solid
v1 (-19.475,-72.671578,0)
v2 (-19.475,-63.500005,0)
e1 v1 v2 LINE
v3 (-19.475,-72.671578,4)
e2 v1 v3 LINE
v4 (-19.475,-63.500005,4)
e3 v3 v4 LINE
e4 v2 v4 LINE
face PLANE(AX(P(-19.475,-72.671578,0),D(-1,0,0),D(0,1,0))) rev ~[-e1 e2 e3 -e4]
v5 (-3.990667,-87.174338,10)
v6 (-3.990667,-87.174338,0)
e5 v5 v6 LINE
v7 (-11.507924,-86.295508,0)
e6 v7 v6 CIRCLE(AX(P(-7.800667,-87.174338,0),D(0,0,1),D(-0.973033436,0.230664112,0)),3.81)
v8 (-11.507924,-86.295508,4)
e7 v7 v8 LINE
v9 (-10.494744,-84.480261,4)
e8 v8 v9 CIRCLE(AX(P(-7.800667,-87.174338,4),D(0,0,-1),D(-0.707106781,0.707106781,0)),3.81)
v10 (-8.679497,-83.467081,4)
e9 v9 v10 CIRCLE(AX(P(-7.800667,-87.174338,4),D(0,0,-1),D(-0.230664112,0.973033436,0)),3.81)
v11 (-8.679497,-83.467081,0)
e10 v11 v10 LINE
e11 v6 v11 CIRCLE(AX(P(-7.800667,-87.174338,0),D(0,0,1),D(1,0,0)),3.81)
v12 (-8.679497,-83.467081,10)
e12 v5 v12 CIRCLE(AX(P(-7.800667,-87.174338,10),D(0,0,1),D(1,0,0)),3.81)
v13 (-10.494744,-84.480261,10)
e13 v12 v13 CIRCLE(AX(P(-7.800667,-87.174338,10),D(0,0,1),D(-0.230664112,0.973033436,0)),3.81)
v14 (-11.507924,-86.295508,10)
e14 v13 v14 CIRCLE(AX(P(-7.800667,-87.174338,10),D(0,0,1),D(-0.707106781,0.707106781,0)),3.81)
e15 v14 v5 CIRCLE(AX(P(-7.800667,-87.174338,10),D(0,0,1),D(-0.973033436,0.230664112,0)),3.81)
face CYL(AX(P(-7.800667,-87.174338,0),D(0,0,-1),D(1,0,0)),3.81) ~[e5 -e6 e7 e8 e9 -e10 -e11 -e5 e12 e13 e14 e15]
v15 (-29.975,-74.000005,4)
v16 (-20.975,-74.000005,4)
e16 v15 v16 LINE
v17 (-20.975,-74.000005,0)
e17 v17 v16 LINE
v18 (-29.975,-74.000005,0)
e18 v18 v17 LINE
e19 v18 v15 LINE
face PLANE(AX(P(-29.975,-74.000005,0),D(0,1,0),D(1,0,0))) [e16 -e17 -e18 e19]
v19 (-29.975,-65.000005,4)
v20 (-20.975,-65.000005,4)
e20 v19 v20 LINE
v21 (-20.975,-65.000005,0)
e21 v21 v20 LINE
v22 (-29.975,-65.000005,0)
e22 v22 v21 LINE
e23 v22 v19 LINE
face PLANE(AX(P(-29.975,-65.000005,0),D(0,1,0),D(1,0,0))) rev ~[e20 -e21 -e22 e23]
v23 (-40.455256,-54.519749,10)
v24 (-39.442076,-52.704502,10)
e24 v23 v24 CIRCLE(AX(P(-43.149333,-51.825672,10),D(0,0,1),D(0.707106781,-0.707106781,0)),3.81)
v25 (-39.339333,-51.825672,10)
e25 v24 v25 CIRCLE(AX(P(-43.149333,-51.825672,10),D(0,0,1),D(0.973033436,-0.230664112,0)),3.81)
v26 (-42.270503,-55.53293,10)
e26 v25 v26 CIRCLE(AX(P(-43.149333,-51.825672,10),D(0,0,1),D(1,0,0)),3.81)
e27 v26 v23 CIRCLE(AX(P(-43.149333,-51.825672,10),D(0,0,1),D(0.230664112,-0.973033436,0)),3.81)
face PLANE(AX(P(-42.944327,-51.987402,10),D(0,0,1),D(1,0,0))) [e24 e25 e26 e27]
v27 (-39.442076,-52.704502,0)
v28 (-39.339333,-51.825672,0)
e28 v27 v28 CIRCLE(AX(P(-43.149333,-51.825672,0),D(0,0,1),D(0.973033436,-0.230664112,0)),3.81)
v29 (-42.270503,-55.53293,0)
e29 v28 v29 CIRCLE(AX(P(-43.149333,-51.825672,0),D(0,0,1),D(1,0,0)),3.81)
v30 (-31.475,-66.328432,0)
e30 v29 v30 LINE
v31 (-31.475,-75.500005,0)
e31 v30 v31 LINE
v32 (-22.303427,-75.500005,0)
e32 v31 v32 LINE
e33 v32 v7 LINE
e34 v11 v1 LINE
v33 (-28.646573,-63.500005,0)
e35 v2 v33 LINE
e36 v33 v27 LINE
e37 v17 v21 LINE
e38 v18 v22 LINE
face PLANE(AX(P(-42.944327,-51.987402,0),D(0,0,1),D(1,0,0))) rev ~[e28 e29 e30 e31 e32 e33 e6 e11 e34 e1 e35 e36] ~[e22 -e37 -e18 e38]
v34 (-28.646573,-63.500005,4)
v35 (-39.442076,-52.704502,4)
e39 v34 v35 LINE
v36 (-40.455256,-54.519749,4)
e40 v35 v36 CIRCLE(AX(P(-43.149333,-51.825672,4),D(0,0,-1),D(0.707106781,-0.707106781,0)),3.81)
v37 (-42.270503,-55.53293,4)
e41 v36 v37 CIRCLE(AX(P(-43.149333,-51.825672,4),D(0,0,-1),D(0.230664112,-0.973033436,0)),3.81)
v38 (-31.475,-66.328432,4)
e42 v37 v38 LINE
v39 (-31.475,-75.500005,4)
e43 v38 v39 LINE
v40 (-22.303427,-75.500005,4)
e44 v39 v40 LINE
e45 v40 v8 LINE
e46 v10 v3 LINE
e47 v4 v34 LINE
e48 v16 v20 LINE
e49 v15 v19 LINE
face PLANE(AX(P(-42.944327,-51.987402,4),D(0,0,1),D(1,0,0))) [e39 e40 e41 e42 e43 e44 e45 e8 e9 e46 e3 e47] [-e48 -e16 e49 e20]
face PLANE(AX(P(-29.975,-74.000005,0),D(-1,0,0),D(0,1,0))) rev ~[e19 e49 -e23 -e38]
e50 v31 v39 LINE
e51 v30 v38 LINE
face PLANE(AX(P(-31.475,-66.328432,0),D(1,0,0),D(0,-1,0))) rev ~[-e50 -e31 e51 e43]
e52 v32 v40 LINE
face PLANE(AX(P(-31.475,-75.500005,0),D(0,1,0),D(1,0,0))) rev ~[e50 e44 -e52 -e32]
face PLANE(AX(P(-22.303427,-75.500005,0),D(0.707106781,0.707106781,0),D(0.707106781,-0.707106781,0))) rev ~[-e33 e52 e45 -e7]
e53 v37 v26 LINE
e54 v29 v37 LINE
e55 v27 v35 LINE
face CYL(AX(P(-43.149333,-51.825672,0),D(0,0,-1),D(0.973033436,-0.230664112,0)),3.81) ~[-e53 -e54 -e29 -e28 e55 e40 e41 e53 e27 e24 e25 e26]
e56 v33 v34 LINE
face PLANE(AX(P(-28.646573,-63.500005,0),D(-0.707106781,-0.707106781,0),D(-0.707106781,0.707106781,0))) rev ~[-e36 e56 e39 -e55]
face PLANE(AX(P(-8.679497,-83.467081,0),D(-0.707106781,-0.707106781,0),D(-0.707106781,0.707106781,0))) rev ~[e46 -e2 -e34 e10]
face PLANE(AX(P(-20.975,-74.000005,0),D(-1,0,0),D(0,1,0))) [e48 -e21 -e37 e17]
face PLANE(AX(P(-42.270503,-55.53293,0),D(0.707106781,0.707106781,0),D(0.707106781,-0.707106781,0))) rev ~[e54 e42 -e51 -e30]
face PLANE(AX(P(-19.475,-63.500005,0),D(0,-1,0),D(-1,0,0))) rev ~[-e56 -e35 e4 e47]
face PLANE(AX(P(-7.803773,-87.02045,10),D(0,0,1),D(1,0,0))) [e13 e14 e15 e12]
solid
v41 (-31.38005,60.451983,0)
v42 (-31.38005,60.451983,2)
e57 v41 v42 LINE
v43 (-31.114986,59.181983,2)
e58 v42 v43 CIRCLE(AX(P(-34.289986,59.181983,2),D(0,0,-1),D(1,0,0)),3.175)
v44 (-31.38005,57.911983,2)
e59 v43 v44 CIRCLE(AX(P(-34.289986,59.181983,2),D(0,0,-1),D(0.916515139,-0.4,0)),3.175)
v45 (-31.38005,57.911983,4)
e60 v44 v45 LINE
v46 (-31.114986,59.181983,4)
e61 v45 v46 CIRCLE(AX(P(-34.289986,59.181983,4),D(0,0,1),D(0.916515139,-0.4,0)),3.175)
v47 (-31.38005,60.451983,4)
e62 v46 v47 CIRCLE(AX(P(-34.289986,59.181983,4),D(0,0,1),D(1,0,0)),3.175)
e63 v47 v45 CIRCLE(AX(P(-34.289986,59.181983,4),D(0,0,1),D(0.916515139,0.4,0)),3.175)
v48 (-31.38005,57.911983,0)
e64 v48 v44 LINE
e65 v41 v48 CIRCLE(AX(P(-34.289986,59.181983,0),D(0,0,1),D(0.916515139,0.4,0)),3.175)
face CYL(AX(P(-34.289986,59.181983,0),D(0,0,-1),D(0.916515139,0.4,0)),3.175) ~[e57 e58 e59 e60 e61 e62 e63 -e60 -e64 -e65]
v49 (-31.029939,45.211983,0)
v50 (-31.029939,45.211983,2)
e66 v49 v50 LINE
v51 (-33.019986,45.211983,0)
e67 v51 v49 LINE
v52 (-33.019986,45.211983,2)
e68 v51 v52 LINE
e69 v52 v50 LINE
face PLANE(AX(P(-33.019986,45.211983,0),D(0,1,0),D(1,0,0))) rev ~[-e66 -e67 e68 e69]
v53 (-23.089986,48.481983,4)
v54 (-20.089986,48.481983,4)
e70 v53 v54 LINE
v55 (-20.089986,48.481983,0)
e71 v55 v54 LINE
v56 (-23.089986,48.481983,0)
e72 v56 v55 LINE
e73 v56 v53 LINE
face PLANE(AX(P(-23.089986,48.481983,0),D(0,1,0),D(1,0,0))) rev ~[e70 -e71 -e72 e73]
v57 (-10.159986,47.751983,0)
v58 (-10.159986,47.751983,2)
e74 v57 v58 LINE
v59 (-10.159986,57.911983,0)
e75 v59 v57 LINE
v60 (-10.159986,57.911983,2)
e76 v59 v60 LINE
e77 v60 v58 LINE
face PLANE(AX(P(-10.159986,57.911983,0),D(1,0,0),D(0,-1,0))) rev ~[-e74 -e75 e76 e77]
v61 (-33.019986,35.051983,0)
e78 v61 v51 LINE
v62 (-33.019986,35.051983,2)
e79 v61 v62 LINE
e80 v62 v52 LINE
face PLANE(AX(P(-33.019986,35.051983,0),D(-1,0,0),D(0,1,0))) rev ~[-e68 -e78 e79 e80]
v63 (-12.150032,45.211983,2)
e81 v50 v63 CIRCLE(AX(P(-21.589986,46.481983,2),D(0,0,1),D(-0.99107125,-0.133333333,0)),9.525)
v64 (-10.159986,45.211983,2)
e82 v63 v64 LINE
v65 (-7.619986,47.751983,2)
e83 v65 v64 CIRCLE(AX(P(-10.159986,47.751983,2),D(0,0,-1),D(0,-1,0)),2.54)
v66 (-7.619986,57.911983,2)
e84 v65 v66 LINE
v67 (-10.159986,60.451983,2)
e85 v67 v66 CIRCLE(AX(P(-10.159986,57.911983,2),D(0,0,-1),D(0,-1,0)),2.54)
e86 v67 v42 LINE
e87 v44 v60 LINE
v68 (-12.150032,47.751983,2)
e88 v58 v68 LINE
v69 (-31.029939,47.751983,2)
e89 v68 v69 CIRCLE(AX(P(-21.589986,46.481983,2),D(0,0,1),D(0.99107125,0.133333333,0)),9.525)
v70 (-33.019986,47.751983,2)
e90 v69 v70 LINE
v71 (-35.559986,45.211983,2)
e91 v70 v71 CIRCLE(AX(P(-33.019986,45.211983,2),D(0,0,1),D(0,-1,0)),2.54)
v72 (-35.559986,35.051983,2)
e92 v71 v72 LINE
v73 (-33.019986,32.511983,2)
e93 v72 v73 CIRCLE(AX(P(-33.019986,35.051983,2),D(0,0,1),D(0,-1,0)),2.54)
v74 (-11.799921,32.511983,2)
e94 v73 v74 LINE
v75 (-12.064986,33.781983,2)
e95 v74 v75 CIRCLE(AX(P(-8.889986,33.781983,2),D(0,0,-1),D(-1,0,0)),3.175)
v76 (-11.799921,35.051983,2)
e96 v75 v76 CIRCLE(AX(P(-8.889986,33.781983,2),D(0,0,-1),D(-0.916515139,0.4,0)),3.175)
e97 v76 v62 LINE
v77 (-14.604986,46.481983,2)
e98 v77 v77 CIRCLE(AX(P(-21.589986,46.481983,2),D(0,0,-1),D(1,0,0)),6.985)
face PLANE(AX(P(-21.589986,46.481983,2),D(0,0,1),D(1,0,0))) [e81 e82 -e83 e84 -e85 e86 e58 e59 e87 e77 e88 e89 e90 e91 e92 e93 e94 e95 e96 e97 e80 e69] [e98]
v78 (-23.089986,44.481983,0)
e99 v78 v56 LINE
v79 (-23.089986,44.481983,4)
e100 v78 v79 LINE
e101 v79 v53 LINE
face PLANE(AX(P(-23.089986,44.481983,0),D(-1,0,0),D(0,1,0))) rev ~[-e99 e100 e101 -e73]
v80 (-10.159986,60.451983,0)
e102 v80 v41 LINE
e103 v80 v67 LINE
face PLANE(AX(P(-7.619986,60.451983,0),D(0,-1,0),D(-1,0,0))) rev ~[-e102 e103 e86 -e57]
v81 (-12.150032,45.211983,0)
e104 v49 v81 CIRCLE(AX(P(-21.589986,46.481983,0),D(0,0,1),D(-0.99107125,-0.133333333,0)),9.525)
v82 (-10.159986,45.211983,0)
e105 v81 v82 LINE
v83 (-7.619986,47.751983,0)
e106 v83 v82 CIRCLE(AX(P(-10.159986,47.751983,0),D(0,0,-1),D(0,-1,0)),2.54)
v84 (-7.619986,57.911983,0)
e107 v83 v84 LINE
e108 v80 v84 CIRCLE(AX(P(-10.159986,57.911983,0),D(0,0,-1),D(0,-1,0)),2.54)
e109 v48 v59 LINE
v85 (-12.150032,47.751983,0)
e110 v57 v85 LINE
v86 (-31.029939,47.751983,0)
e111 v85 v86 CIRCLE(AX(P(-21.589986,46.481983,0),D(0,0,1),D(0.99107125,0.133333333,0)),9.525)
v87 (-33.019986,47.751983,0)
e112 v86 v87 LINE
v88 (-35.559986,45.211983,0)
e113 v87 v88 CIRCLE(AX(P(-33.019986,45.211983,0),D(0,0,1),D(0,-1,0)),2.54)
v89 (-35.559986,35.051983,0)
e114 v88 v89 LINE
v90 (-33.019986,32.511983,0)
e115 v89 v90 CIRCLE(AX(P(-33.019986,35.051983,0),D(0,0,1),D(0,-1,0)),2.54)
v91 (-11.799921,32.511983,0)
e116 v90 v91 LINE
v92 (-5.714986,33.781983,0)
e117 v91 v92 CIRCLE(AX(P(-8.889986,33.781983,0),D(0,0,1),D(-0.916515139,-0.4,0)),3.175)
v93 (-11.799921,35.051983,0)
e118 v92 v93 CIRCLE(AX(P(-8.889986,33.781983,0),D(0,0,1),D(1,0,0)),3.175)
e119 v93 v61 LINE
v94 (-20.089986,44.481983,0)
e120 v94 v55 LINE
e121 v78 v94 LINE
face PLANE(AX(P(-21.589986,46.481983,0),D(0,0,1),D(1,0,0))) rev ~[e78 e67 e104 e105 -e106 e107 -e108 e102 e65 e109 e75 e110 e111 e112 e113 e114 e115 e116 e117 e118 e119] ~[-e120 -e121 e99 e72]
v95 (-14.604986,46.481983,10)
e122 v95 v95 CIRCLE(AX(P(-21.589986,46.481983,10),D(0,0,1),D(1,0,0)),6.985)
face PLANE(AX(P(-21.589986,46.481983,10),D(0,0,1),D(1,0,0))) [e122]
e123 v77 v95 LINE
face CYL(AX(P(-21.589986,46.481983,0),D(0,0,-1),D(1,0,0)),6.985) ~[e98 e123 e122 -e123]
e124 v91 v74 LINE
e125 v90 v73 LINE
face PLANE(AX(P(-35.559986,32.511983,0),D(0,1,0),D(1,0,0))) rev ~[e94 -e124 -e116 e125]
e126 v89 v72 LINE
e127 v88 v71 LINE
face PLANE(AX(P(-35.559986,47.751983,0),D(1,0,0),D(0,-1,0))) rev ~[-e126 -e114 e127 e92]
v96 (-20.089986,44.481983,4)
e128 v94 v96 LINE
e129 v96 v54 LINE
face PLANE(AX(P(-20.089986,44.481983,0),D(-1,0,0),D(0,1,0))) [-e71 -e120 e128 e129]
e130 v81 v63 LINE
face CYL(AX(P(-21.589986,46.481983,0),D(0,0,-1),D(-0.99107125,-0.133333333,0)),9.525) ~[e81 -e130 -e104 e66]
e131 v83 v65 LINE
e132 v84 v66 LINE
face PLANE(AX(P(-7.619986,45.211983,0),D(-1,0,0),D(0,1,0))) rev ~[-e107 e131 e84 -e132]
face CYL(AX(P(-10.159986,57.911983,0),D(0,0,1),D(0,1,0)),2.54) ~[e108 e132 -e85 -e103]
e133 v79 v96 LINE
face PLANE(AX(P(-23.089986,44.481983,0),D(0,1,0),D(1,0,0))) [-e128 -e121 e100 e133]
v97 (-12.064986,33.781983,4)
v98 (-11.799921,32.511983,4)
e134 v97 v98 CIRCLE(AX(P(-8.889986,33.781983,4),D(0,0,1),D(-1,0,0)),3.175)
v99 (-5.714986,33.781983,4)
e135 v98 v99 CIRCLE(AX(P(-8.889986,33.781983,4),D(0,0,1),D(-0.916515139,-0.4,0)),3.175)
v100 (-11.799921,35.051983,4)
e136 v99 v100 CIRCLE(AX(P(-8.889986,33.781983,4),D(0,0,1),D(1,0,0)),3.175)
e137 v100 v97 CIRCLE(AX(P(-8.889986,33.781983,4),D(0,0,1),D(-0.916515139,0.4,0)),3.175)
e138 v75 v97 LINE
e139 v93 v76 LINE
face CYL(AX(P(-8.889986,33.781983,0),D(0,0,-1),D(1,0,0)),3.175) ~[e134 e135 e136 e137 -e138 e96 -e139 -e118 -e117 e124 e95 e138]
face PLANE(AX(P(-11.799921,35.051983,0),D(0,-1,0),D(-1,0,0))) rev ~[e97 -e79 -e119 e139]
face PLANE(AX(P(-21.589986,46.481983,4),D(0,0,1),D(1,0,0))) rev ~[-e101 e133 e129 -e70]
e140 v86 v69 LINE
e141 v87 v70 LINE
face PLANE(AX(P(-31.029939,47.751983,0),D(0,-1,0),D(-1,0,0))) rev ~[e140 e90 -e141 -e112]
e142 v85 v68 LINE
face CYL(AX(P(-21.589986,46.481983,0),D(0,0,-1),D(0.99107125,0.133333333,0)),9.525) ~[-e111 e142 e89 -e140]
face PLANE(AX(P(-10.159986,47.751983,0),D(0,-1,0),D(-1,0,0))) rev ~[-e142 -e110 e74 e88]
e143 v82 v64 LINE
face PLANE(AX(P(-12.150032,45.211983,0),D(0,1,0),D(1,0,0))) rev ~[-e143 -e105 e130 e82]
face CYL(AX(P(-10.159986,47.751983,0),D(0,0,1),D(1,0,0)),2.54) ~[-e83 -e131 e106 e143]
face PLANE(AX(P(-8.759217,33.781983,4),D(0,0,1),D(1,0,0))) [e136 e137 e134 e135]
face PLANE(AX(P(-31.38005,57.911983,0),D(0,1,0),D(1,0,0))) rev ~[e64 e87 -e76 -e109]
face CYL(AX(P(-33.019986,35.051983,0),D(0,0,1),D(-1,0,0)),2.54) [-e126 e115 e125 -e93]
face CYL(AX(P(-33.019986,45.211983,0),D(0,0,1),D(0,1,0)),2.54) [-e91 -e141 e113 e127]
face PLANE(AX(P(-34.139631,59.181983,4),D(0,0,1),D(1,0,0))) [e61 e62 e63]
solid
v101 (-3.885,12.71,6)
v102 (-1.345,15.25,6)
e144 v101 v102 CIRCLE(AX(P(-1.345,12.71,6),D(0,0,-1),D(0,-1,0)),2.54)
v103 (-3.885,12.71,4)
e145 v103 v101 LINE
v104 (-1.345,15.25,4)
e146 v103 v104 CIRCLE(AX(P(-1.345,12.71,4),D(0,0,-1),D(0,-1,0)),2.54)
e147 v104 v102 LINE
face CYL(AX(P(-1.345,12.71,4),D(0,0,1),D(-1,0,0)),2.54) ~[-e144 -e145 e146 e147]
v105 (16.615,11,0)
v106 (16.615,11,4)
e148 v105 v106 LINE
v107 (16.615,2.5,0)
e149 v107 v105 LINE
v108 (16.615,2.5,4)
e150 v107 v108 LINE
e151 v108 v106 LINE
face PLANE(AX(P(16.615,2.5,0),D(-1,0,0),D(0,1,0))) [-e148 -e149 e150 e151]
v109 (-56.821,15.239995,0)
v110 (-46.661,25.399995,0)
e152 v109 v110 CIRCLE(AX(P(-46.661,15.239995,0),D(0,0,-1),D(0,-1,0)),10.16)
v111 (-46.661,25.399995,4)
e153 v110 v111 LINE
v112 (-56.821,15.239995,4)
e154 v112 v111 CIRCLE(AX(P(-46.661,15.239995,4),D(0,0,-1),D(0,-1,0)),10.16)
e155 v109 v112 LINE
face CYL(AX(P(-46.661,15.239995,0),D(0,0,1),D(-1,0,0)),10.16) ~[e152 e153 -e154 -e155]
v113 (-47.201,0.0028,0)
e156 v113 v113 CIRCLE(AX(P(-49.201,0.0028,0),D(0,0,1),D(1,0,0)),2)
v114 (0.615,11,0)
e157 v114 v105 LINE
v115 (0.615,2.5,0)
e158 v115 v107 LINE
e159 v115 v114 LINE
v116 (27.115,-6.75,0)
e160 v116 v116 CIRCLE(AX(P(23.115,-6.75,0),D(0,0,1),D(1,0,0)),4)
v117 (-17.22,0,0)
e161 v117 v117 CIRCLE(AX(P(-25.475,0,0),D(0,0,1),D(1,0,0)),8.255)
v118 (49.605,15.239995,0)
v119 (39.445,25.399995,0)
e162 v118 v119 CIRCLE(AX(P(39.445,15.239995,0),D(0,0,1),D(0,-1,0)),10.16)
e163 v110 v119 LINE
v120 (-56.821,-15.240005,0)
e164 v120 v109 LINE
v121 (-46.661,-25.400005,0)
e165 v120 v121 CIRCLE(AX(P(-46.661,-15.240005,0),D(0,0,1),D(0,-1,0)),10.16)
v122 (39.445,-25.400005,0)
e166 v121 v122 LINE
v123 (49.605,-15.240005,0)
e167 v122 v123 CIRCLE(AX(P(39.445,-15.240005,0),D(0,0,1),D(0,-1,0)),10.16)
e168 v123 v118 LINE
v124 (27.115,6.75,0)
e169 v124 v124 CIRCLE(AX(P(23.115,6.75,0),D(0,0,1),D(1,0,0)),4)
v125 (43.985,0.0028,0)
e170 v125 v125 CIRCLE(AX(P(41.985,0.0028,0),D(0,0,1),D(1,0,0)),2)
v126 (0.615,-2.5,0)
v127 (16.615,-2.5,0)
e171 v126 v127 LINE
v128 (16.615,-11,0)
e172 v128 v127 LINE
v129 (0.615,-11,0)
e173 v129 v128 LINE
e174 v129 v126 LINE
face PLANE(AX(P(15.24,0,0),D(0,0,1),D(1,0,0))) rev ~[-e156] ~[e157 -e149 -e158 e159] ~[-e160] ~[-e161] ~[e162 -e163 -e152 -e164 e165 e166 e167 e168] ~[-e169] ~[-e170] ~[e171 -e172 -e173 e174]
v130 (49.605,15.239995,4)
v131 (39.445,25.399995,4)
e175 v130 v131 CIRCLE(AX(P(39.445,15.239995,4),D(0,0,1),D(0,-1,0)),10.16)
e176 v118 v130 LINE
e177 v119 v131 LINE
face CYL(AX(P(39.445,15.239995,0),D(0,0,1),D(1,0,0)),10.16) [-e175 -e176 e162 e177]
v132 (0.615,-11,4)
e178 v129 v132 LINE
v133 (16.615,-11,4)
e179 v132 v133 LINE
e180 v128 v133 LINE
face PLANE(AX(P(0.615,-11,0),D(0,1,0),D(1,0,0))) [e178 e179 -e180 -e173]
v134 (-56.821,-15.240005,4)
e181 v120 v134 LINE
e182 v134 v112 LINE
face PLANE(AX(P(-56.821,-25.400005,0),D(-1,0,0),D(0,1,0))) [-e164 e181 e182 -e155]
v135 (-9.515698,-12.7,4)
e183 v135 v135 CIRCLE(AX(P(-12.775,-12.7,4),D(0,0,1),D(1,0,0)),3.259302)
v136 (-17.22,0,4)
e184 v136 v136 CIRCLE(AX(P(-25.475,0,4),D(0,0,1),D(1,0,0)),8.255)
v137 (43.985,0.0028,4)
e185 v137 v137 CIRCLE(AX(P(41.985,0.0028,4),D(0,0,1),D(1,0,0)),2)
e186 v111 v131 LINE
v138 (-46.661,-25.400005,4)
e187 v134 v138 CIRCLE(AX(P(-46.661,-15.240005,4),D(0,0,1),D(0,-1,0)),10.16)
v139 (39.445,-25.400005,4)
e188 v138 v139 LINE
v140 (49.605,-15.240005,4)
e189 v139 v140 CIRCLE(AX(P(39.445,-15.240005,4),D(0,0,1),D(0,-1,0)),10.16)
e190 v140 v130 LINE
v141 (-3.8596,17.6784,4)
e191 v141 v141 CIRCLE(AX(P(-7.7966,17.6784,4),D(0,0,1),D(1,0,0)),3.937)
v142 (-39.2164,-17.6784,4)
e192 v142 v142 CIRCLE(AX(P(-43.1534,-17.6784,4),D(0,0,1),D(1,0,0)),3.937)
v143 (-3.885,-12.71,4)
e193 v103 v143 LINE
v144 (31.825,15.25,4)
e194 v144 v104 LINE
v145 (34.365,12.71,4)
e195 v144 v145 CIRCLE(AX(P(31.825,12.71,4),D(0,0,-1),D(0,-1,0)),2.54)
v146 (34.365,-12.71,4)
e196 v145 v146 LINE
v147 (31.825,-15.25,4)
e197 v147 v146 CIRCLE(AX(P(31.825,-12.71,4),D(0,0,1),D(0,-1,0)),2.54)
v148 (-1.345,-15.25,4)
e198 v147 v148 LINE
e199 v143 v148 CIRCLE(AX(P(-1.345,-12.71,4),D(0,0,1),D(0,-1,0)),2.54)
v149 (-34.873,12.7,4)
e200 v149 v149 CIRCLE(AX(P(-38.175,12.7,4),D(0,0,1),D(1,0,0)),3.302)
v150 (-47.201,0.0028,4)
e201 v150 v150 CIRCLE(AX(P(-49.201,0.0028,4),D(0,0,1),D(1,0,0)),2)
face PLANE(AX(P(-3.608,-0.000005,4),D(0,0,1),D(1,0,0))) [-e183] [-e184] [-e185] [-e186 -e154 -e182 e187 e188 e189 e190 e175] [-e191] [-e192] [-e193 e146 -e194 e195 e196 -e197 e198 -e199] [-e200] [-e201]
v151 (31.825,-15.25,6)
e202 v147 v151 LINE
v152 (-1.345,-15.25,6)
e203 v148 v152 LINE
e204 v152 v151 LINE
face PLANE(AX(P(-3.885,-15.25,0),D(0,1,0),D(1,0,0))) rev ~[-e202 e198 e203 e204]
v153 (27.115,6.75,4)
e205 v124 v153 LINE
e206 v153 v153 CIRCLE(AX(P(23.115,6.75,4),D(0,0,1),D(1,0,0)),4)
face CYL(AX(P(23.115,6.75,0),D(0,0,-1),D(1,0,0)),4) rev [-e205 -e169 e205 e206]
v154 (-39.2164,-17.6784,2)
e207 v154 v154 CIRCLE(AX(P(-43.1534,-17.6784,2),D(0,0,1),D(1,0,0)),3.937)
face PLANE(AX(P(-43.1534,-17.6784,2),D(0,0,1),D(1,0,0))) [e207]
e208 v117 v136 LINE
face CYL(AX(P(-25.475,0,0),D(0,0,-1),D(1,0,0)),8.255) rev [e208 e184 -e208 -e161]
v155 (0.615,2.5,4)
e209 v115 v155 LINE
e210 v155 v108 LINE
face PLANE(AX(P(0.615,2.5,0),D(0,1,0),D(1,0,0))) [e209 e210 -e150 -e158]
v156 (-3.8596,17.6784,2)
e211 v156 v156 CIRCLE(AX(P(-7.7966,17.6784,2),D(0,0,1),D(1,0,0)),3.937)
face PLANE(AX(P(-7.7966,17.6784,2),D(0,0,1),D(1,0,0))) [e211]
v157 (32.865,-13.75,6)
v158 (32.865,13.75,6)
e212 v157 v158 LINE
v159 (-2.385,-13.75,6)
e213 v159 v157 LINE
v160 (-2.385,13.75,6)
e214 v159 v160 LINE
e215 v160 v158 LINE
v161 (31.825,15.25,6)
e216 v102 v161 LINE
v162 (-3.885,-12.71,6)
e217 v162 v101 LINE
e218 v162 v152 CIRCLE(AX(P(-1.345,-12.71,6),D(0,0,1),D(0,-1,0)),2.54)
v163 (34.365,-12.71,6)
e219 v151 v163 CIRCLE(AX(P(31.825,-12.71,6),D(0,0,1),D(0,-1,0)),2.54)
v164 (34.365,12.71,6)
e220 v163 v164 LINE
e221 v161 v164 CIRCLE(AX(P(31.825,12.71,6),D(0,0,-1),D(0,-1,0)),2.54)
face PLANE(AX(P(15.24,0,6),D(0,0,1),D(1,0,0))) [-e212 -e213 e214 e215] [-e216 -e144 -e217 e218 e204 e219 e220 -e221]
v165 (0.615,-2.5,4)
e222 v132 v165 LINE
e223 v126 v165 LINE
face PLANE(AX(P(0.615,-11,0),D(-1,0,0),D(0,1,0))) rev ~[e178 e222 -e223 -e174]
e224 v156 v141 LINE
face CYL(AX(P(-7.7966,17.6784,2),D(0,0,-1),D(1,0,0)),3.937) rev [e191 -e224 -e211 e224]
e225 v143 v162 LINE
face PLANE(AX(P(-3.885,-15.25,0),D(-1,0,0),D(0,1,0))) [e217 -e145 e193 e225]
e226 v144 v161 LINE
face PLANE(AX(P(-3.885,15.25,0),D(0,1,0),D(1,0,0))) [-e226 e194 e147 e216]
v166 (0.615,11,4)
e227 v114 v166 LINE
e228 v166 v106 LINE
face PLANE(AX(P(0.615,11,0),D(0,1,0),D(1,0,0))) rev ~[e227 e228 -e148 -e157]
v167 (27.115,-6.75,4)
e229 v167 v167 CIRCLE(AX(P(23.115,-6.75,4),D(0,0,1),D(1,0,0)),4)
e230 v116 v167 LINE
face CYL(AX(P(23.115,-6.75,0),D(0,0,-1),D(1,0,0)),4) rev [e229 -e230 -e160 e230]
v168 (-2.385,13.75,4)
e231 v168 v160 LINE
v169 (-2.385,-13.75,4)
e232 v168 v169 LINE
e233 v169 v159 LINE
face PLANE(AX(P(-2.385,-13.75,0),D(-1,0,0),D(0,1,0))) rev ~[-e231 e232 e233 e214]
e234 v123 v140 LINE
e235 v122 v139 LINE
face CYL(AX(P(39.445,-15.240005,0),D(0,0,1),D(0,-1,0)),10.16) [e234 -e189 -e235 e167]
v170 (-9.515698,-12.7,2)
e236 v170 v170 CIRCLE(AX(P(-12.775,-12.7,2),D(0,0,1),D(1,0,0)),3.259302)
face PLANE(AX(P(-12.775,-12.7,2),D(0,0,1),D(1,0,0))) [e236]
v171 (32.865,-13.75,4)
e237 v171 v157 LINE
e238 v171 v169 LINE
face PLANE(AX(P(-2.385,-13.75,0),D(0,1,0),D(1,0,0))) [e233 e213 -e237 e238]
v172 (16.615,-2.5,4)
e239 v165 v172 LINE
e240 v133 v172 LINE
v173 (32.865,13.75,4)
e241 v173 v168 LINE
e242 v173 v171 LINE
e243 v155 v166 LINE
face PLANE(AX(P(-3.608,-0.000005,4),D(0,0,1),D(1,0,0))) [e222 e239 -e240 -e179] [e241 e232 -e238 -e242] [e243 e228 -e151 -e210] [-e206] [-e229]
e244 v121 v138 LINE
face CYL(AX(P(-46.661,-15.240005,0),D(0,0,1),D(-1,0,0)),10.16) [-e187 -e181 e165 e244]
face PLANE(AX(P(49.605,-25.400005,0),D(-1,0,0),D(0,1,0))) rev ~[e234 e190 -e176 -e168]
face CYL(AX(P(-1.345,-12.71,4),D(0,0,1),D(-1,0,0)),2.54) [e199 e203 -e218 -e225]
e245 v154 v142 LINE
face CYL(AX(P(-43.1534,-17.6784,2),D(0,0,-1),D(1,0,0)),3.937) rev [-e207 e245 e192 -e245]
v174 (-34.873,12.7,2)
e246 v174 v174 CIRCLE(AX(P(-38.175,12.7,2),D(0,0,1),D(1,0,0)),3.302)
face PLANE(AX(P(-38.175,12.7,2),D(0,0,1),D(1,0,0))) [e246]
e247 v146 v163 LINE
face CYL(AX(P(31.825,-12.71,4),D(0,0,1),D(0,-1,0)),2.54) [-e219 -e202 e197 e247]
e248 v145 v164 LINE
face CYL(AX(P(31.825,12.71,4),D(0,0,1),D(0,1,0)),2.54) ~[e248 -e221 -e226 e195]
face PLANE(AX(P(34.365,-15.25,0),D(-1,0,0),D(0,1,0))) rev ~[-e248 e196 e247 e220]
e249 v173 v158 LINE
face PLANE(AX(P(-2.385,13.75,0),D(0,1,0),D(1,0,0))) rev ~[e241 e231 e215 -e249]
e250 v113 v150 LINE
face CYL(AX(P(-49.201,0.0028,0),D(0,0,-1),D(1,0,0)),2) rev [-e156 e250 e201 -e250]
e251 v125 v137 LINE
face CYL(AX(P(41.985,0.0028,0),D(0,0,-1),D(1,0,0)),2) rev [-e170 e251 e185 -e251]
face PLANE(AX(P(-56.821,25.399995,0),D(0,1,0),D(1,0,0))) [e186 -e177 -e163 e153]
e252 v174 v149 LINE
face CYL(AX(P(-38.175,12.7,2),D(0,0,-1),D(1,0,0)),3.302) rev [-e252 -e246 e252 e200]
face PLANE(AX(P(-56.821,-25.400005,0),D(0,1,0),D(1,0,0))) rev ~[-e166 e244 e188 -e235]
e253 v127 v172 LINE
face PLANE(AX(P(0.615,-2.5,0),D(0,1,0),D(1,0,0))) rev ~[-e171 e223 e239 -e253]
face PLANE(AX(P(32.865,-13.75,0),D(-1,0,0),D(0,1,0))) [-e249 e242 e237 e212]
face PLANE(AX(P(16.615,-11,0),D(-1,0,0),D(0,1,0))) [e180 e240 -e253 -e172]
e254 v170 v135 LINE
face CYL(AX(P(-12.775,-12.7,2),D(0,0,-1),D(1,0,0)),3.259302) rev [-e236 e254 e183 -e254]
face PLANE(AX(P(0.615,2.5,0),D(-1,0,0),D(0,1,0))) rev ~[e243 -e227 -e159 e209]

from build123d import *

# Parameters (mm, degrees)
F0_W      = 106.426
F0_H      = 50.8
F0_R      = 3.937
F0_R_2    = 3.2593015929
F0_R_3    = 2
F0_R_4    = 8.255
F0_R_5    = 3.302
F0_W_2    = 38.25
F0_H_2    = 30.5
F0_W_3    = 35.25
F0_H_3    = 27.5
F0_W_4    = 16
F0_H_4    = 8.5
F0_R_6    = 4
F1_DEPTH  = 4
F2_R      = 10.16
F3_DEPTH  = 6
F4_R      = 6.985
F4_W      = 1.27
F4_H      = 10.16
F4_H_2    = 1.27
F4_W_2    = 3
F4_H_3    = 4
F5_DEPTH  = 2
F6_DEPTH  = 10
F7_R      = 2.54
F8_DEPTH  = 4
F9_DEPTH  = 4
F10_START = 2
F10_DEPTH = 2
F11_W     = 9
F11_H     = 9
F12_DEPTH = 4
F13_R     = 2.54
F14_DEPTH = 10


# Not quite as in the source:
# - a feature names something its author has since deleted; it is built from what else it names


with BuildPart() as f1:
    # F0 (on Top) → F1 (new body)
    with BuildSketch(Plane.XY):
        with Locations((-3.608, -5.1e-06)):
            Rectangle(F0_W, F0_H)
        with Locations((-43.1534, -17.6784)):
            Circle(F0_R, mode=Mode.SUBTRACT)
        with Locations((-12.775, -12.7)):
            Circle(F0_R_2, mode=Mode.SUBTRACT)
        with Locations((-49.201, 0.0028)):
            Circle(F0_R_3, mode=Mode.SUBTRACT)
        with Locations((-25.475, 0)):
            Circle(F0_R_4, mode=Mode.SUBTRACT)
        with Locations((-38.175, 12.7)):
            Circle(F0_R_5, mode=Mode.SUBTRACT)
        with Locations((-7.7966, 17.6784)):
            Circle(F0_R, mode=Mode.SUBTRACT)
        with Locations((15.24, 0)):
            Rectangle(F0_W_2, F0_H_2, mode=Mode.SUBTRACT)
        with Locations((41.985, 0.0028)):
            Circle(F0_R_3, mode=Mode.SUBTRACT)
        with Locations((15.24, 0)):
            Rectangle(F0_W_2, F0_H_2)
        with Locations((15.24, 0)):
            Rectangle(F0_W_3, F0_H_3, mode=Mode.SUBTRACT)
        with Locations((15.24, 0)):
            Rectangle(F0_W_3, F0_H_3)
        with Locations((8.615, -6.75)):
            Rectangle(F0_W_4, F0_H_4, mode=Mode.SUBTRACT)
        with Locations((23.115, -6.75)):
            Circle(F0_R_6, mode=Mode.SUBTRACT)
        with Locations((8.615, 6.75)):
            Rectangle(F0_W_4, F0_H_4, mode=Mode.SUBTRACT)
        with Locations((23.115, 6.75)):
            Circle(F0_R_6, mode=Mode.SUBTRACT)
        with Locations((-38.175, 12.7)):
            Circle(F0_R_5)
        with Locations((-12.775, -12.7)):
            Circle(F0_R_2)
        with Locations((-7.7966, 17.6784)):
            Circle(F0_R)
        with Locations((-43.1534, -17.6784)):
            Circle(F0_R)
    extrude(amount=F1_DEPTH)

    # F2
    f2_edges = [f1.edges().sort_by_distance(p)[0] for p in [
        (-56.821, -25.400005, 2),
        (-56.821, 25.399995, 2),
        (49.605, 25.399995, 2),
        (49.605, -25.400005, 2),
    ]]
    fillet(f2_edges, radius=F2_R)

    # F0 (on Top) → F3 (join)
    with BuildSketch(Plane.XY):
        with Locations((15.24, 0)):
            Rectangle(F0_W_2, F0_H_2)
        with Locations((15.24, 0)):
            Rectangle(F0_W_3, F0_H_3, mode=Mode.SUBTRACT)
    extrude(amount=F3_DEPTH)

    # F0 (on Top) → F10 (cut)
    with BuildSketch(Plane.XY.offset(F10_START)):
        with Locations((-38.175, 12.7)):
            Circle(F0_R_5)
        with Locations((-12.775, -12.7)):
            Circle(F0_R_2)
        with Locations((-7.7966, 17.6784)):
            Circle(F0_R)
        with Locations((-43.1534, -17.6784)):
            Circle(F0_R)
    extrude(amount=F10_DEPTH, mode=Mode.SUBTRACT)

    # F13
    f13_edges = [f1.edges().sort_by_distance(p)[0] for p in [
        (-3.885, 15.25, 5),
        (34.365, 15.25, 5),
        (34.365, -15.25, 5),
        (-3.885, -15.25, 5),
    ]]
    fillet(f13_edges, radius=F13_R)


with BuildPart() as f5:
    # F4 (on Top) → F5 (new body)
    with BuildSketch(Plane.XY):
        with BuildLine():
            Line((-13.3349857867, 47.7519830668), (-12.1500321321, 47.7519830668))
            ThreePointArc((-12.1500321321, 47.7519830668), (-21.5899857867, 56.0069830668), (-31.0299394412, 47.7519830668))
            Line((-31.0299394412, 47.7519830668), (-29.8449857867, 47.7519830668))
            Line((-29.8449857867, 47.7519830668), (-29.8449857867, 45.2119830668))
            Line((-29.8449857867, 45.2119830668), (-31.0299394412, 45.2119830668))
            ThreePointArc((-31.0299394412, 45.2119830668), (-21.5899857867, 36.9569830668), (-12.1500321321, 45.2119830668))
            Line((-12.1500321321, 45.2119830668), (-13.3349857867, 45.2119830668))
            Line((-13.3349857867, 45.2119830668), (-13.3349857867, 47.7519830668))
        make_face()
        with Locations((-21.5899857867, 46.4819830668)):
            Circle(F4_R, mode=Mode.SUBTRACT)
        with BuildLine():
            ThreePointArc((-5.7149857867, 33.7819830668), (-8.241302668, 36.8900106104), (-11.799921353, 35.0519830668))
            Line((-11.799921353, 35.0519830668), (-7.6199857867, 35.0519830668))
            Line((-7.6199857867, 35.0519830668), (-7.6199857867, 32.5119830668))
            Line((-7.6199857867, 32.5119830668), (-11.799921353, 32.5119830668))
            ThreePointArc((-11.799921353, 32.5119830668), (-8.241302668, 30.6739555232), (-5.7149857867, 33.7819830668))
        make_face()
        with BuildLine():
            ThreePointArc((-31.3800502204, 60.4519830668), (-37.4649857867, 59.1819830668), (-31.3800502204, 57.9119830668))
            Line((-31.3800502204, 57.9119830668), (-34.2899857867, 57.9119830668))
            Line((-34.2899857867, 57.9119830668), (-34.2899857867, 59.1819830668))
            Line((-34.2899857867, 59.1819830668), (-34.2899857867, 60.4519830668))
            Line((-34.2899857867, 60.4519830668), (-31.3800502204, 60.4519830668))
        make_face()
        with BuildLine():
            ThreePointArc((-31.1149857867, 59.1819830668), (-31.1819582431, 59.8306661855), (-31.3800502204, 60.4519830668))
            Line((-31.3800502204, 60.4519830668), (-34.2899857867, 60.4519830668))
            Line((-34.2899857867, 60.4519830668), (-34.2899857867, 59.1819830668))
            Line((-34.2899857867, 59.1819830668), (-31.1149857867, 59.1819830668))
        make_face()
        with BuildLine():
            Line((-34.2899857867, 57.9119830668), (-31.3800502204, 57.9119830668))
            ThreePointArc((-31.3800502204, 57.9119830668), (-31.1819582431, 58.5332999481), (-31.1149857867, 59.1819830668))
            Line((-31.1149857867, 59.1819830668), (-34.2899857867, 59.1819830668))
            Line((-34.2899857867, 59.1819830668), (-34.2899857867, 57.9119830668))
        make_face()
        with BuildLine():
            Line((-31.3800502204, 57.9119830668), (-10.1599857867, 57.9119830668))
            Line((-10.1599857867, 57.9119830668), (-10.1599857867, 59.1819830668))
            Line((-10.1599857867, 59.1819830668), (-31.1149857867, 59.1819830668))
            ThreePointArc((-31.1149857867, 59.1819830668), (-31.1819582431, 58.5332999481), (-31.3800502204, 57.9119830668))
        make_face()
        with BuildLine():
            Line((-31.1149857867, 59.1819830668), (-10.1599857867, 59.1819830668))
            Line((-10.1599857867, 59.1819830668), (-10.1599857867, 60.4519830668))
            Line((-10.1599857867, 60.4519830668), (-31.3800502204, 60.4519830668))
            ThreePointArc((-31.3800502204, 60.4519830668), (-31.1819582431, 59.8306661855), (-31.1149857867, 59.1819830668))
        make_face()
        Polygon((-8.8899857867, 57.9119830668), (-8.8899857867, 47.7519830668), (-7.6199857867, 47.7519830668), (-7.6199857867, 60.4519830668), (-8.8899857867, 60.4519830668), (-8.8899857867, 59.1819830668), align=None)
        with Locations((-9.5249857867, 52.8319830668)):
            Rectangle(F4_W, F4_H)
        with Locations((-9.5249857867, 58.5469830668)):
            Rectangle(F4_W, F4_H_2)
        with Locations((-9.5249857867, 59.8169830668)):
            Rectangle(F4_W, F4_H_2)
        Polygon((-8.8899857867, 46.4819830668), (-10.1599857867, 46.4819830668), (-10.1599857867, 45.2119830668), (-7.6199857867, 45.2119830668), (-7.6199857867, 47.7519830668), (-8.8899857867, 47.7519830668), align=None)
        with Locations((-9.5249857867, 47.1169830668)):
            Rectangle(F4_W, F4_H_2)
        with BuildLine():
            ThreePointArc((-12.1500321321, 47.7519830668), (-12.0862711561, 47.1184052696), (-12.0649857867, 46.4819830668))
            Line((-12.0649857867, 46.4819830668), (-10.1599857867, 46.4819830668))
            Line((-10.1599857867, 46.4819830668), (-10.1599857867, 47.7519830668))
            Line((-10.1599857867, 47.7519830668), (-12.1500321321, 47.7519830668))
        make_face()
        with BuildLine():
            Line((-10.1599857867, 46.4819830668), (-12.0649857867, 46.4819830668))
            ThreePointArc((-12.0649857867, 46.4819830668), (-12.0862711561, 45.845560864), (-12.1500321321, 45.2119830668))
            Line((-12.1500321321, 45.2119830668), (-10.1599857867, 45.2119830668))
            Line((-10.1599857867, 45.2119830668), (-10.1599857867, 46.4819830668))
        make_face()
        with BuildLine():
            ThreePointArc((-12.1500321321, 45.2119830668), (-12.0862711561, 45.845560864), (-12.0649857867, 46.4819830668))
            ThreePointArc((-12.0649857867, 46.4819830668), (-12.0862711561, 47.1184052696), (-12.1500321321, 47.7519830668))
            Line((-12.1500321321, 47.7519830668), (-13.3349857867, 47.7519830668))
            Line((-13.3349857867, 47.7519830668), (-13.3349857867, 45.2119830668))
            Line((-13.3349857867, 45.2119830668), (-12.1500321321, 45.2119830668))
        make_face()
        with BuildLine():
            ThreePointArc((-31.1149857867, 46.4819830668), (-31.0937004173, 47.1184052696), (-31.0299394412, 47.7519830668))
            Line((-31.0299394412, 47.7519830668), (-33.0199857867, 47.7519830668))
            Line((-33.0199857867, 47.7519830668), (-33.0199857867, 46.4819830668))
            Line((-33.0199857867, 46.4819830668), (-31.1149857867, 46.4819830668))
        make_face()
        with BuildLine():
            Line((-33.0199857867, 45.2119830668), (-31.0299394412, 45.2119830668))
            ThreePointArc((-31.0299394412, 45.2119830668), (-31.0937004173, 45.845560864), (-31.1149857867, 46.4819830668))
            Line((-31.1149857867, 46.4819830668), (-33.0199857867, 46.4819830668))
            Line((-33.0199857867, 46.4819830668), (-33.0199857867, 45.2119830668))
        make_face()
        with BuildLine():
            Line((-29.8449857867, 47.7519830668), (-31.0299394412, 47.7519830668))
            ThreePointArc((-31.0299394412, 47.7519830668), (-31.0937004173, 47.1184052696), (-31.1149857867, 46.4819830668))
            ThreePointArc((-31.1149857867, 46.4819830668), (-31.0937004173, 45.845560864), (-31.0299394412, 45.2119830668))
            Line((-31.0299394412, 45.2119830668), (-29.8449857867, 45.2119830668))
            Line((-29.8449857867, 45.2119830668), (-29.8449857867, 47.7519830668))
        make_face()
        Polygon((-33.0199857867, 46.4819830668), (-33.0199857867, 47.7519830668), (-35.5599857867, 47.7519830668), (-35.5599857867, 45.2119830668), (-34.2899857867, 45.2119830668), (-34.2899857867, 46.4819830668), align=None)
        with Locations((-33.6549857867, 45.8469830668)):
            Rectangle(F4_W, F4_H_2)
        with Locations((-34.9249857867, 40.1319830668)):
            Rectangle(F4_W, F4_H)
        with Locations((-33.6549857867, 40.1319830668)):
            Rectangle(F4_W, F4_H)
        Polygon((-34.2899857867, 33.7819830668), (-34.2899857867, 35.0519830668), (-35.5599857867, 35.0519830668), (-35.5599857867, 32.5119830668), (-33.0199857867, 32.5119830668), (-33.0199857867, 33.7819830668), align=None)
        with Locations((-33.6549857867, 34.4169830668)):
            Rectangle(F4_W, F4_H_2)
        with BuildLine():
            Line((-11.799921353, 35.0519830668), (-33.0199857867, 35.0519830668))
            Line((-33.0199857867, 35.0519830668), (-33.0199857867, 33.7819830668))
            Line((-33.0199857867, 33.7819830668), (-12.0649857867, 33.7819830668))
            ThreePointArc((-12.0649857867, 33.7819830668), (-11.9980133302, 34.4306661855), (-11.799921353, 35.0519830668))
        make_face()
        with BuildLine():
            Line((-12.0649857867, 33.7819830668), (-33.0199857867, 33.7819830668))
            Line((-33.0199857867, 33.7819830668), (-33.0199857867, 32.5119830668))
            Line((-33.0199857867, 32.5119830668), (-11.799921353, 32.5119830668))
            ThreePointArc((-11.799921353, 32.5119830668), (-11.9980133302, 33.1332999481), (-12.0649857867, 33.7819830668))
        make_face()
        with BuildLine():
            Line((-7.6199857867, 35.0519830668), (-11.799921353, 35.0519830668))
            ThreePointArc((-11.799921353, 35.0519830668), (-11.9980133302, 34.4306661855), (-12.0649857867, 33.7819830668))
            ThreePointArc((-12.0649857867, 33.7819830668), (-11.9980133302, 33.1332999481), (-11.799921353, 32.5119830668))
            Line((-11.799921353, 32.5119830668), (-7.6199857867, 32.5119830668))
            Line((-7.6199857867, 32.5119830668), (-7.6199857867, 35.0519830668))
        make_face()
        with Locations((-21.5899857867, 46.4819830668)):
            Circle(F4_R)
        with Locations((-21.5899857867, 46.4819830668)):
            Rectangle(F4_W_2, F4_H_3, mode=Mode.SUBTRACT)
        with Locations((-21.5899857867, 46.4819830668)):
            Rectangle(F4_W_2, F4_H_3)
    extrude(amount=F5_DEPTH)

    # F4 (on Top) → F6 (join)
    with BuildSketch(Plane.XY):
        with Locations((-21.5899857867, 46.4819830668)):
            Circle(F4_R)
        with Locations((-21.5899857867, 46.4819830668)):
            Rectangle(F4_W_2, F4_H_3, mode=Mode.SUBTRACT)
        with Locations((-21.5899857867, 46.4819830668)):
            Rectangle(F4_W_2, F4_H_3)
    extrude(amount=F6_DEPTH)

    # F7
    f7_edges = [f5.edges().sort_by_distance(p)[0] for p in [
        (-7.619986, 60.451983, 1),
        (-7.619986, 45.211983, 1),
        (-35.559986, 32.511983, 1),
        (-35.559986, 47.751983, 1),
    ]]
    fillet(f7_edges, radius=F7_R)

    # F4 (on Top) → F8 (cut)
    with BuildSketch(Plane.XY):
        with Locations((-21.5899857867, 46.4819830668)):
            Rectangle(F4_W_2, F4_H_3)
    extrude(amount=F8_DEPTH, mode=Mode.SUBTRACT)

    # F4 (on Top) → F9 (join)
    with BuildSketch(Plane.XY):
        with BuildLine():
            ThreePointArc((-31.3800502204, 60.4519830668), (-37.4649857867, 59.1819830668), (-31.3800502204, 57.9119830668))
            Line((-31.3800502204, 57.9119830668), (-34.2899857867, 57.9119830668))
            Line((-34.2899857867, 57.9119830668), (-34.2899857867, 59.1819830668))
            Line((-34.2899857867, 59.1819830668), (-34.2899857867, 60.4519830668))
            Line((-34.2899857867, 60.4519830668), (-31.3800502204, 60.4519830668))
        make_face()
        with BuildLine():
            ThreePointArc((-31.1149857867, 59.1819830668), (-31.1819582431, 59.8306661855), (-31.3800502204, 60.4519830668))
            Line((-31.3800502204, 60.4519830668), (-34.2899857867, 60.4519830668))
            Line((-34.2899857867, 60.4519830668), (-34.2899857867, 59.1819830668))
            Line((-34.2899857867, 59.1819830668), (-31.1149857867, 59.1819830668))
        make_face()
        with BuildLine():
            Line((-34.2899857867, 57.9119830668), (-31.3800502204, 57.9119830668))
            ThreePointArc((-31.3800502204, 57.9119830668), (-31.1819582431, 58.5332999481), (-31.1149857867, 59.1819830668))
            Line((-31.1149857867, 59.1819830668), (-34.2899857867, 59.1819830668))
            Line((-34.2899857867, 59.1819830668), (-34.2899857867, 57.9119830668))
        make_face()
        with BuildLine():
            ThreePointArc((-5.7149857867, 33.7819830668), (-8.241302668, 36.8900106104), (-11.799921353, 35.0519830668))
            Line((-11.799921353, 35.0519830668), (-7.6199857867, 35.0519830668))
            Line((-7.6199857867, 35.0519830668), (-7.6199857867, 32.5119830668))
            Line((-7.6199857867, 32.5119830668), (-11.799921353, 32.5119830668))
            ThreePointArc((-11.799921353, 32.5119830668), (-8.241302668, 30.6739555232), (-5.7149857867, 33.7819830668))
        make_face()
        with BuildLine():
            Line((-7.6199857867, 35.0519830668), (-11.799921353, 35.0519830668))
            ThreePointArc((-11.799921353, 35.0519830668), (-11.9980133302, 34.4306661855), (-12.0649857867, 33.7819830668))
            ThreePointArc((-12.0649857867, 33.7819830668), (-11.9980133302, 33.1332999481), (-11.799921353, 32.5119830668))
            Line((-11.799921353, 32.5119830668), (-7.6199857867, 32.5119830668))
            Line((-7.6199857867, 32.5119830668), (-7.6199857867, 35.0519830668))
        make_face()
    extrude(amount=F9_DEPTH)


with BuildPart() as f12:
    # F11 (on Top) → F12 (new body)
    with BuildSketch(Plane.XY):
        with BuildLine():
            ThreePointArc((-42.2705026911, -55.5329295336), (-41.2924403918, -55.152540039), (-40.4552561211, -54.5197489789))
            ThreePointArc((-40.4552561211, -54.5197489789), (-39.822465061, -53.6825647082), (-39.4420755664, -52.7045024089))
            ThreePointArc((-39.4420755664, -52.7045024089), (-39.36510578, -52.2680799524), (-39.3393329574, -51.8256721426))
            ThreePointArc((-39.3393329574, -51.8256721426), (-46.1380152184, -49.4626490063), (-42.2705026911, -55.5329295336))
        make_face()
        with BuildLine():
            Line((-40.4552561211, -54.5197489789), (-31.475, -63.5000051))
            Line((-31.475, -63.5000051), (-28.6465728753, -63.5000051))
            Line((-28.6465728753, -63.5000051), (-39.4420755664, -52.7045024089))
            ThreePointArc((-39.4420755664, -52.7045024089), (-39.822465061, -53.6825647082), (-40.4552561211, -54.5197489789))
        make_face()
        with BuildLine():
            Line((-31.475, -66.3284322247), (-31.475, -63.5000051))
            Line((-31.475, -63.5000051), (-40.4552561211, -54.5197489789))
            ThreePointArc((-40.4552561211, -54.5197489789), (-41.2924403918, -55.152540039), (-42.2705026911, -55.5329295336))
            Line((-42.2705026911, -55.5329295336), (-31.475, -66.3284322247))
        make_face()
        Polygon((-28.6465728753, -63.5000051), (-31.475, -63.5000051), (-31.475, -66.3284322247), (-31.475, -75.5000051), (-22.3034271247, -75.5000051), (-19.475, -75.5000051), (-19.475, -72.6715779753), (-19.475, -63.5000051), align=None)
        with Locations((-25.475, -69.5000051)):
            Rectangle(F11_W, F11_H, mode=Mode.SUBTRACT)
        with BuildLine():
            Line((-8.6794973089, -83.4670806664), (-19.475, -72.6715779753))
            Line((-19.475, -72.6715779753), (-19.475, -75.5000051))
            Line((-19.475, -75.5000051), (-10.4947438789, -84.4802612211))
            ThreePointArc((-10.4947438789, -84.4802612211), (-9.6575596082, -83.847470161), (-8.6794973089, -83.4670806664))
        make_face()
        with BuildLine():
            Line((-19.475, -75.5000051), (-22.3034271247, -75.5000051))
            Line((-22.3034271247, -75.5000051), (-11.5079244336, -86.2955077911))
            ThreePointArc((-11.5079244336, -86.2955077911), (-11.127534939, -85.3174454918), (-10.4947438789, -84.4802612211))
            Line((-10.4947438789, -84.4802612211), (-19.475, -75.5000051))
        make_face()
        with BuildLine():
            ThreePointArc((-3.9906670426, -87.1743380574), (-5.4376439063, -84.1856557964), (-8.6794973089, -83.4670806664))
            ThreePointArc((-8.6794973089, -83.4670806664), (-9.6575596082, -83.847470161), (-10.4947438789, -84.4802612211))
            ThreePointArc((-10.4947438789, -84.4802612211), (-11.127534939, -85.3174454918), (-11.5079244336, -86.2955077911))
            ThreePointArc((-11.5079244336, -86.2955077911), (-8.2430748524, -90.9585652347), (-3.9906670426, -87.1743380574))
        make_face()
    extrude(amount=F12_DEPTH)

    # F11 (on Top) → F14 (join)
    with BuildSketch(Plane.XY):
        with BuildLine():
            ThreePointArc((-42.2705026911, -55.5329295336), (-41.2924403918, -55.152540039), (-40.4552561211, -54.5197489789))
            ThreePointArc((-40.4552561211, -54.5197489789), (-39.822465061, -53.6825647082), (-39.4420755664, -52.7045024089))
            ThreePointArc((-39.4420755664, -52.7045024089), (-39.36510578, -52.2680799524), (-39.3393329574, -51.8256721426))
            ThreePointArc((-39.3393329574, -51.8256721426), (-46.1380152184, -49.4626490063), (-42.2705026911, -55.5329295336))
        make_face()
        with BuildLine():
            ThreePointArc((-3.9906670426, -87.1743380574), (-5.4376439063, -84.1856557964), (-8.6794973089, -83.4670806664))
            ThreePointArc((-8.6794973089, -83.4670806664), (-9.6575596082, -83.847470161), (-10.4947438789, -84.4802612211))
            ThreePointArc((-10.4947438789, -84.4802612211), (-11.127534939, -85.3174454918), (-11.5079244336, -86.2955077911))
            ThreePointArc((-11.5079244336, -86.2955077911), (-8.2430748524, -90.9585652347), (-3.9906670426, -87.1743380574))
        make_face()
    extrude(amount=F14_DEPTH)


solid = Compound([f1.part, f5.part, f12.part])
